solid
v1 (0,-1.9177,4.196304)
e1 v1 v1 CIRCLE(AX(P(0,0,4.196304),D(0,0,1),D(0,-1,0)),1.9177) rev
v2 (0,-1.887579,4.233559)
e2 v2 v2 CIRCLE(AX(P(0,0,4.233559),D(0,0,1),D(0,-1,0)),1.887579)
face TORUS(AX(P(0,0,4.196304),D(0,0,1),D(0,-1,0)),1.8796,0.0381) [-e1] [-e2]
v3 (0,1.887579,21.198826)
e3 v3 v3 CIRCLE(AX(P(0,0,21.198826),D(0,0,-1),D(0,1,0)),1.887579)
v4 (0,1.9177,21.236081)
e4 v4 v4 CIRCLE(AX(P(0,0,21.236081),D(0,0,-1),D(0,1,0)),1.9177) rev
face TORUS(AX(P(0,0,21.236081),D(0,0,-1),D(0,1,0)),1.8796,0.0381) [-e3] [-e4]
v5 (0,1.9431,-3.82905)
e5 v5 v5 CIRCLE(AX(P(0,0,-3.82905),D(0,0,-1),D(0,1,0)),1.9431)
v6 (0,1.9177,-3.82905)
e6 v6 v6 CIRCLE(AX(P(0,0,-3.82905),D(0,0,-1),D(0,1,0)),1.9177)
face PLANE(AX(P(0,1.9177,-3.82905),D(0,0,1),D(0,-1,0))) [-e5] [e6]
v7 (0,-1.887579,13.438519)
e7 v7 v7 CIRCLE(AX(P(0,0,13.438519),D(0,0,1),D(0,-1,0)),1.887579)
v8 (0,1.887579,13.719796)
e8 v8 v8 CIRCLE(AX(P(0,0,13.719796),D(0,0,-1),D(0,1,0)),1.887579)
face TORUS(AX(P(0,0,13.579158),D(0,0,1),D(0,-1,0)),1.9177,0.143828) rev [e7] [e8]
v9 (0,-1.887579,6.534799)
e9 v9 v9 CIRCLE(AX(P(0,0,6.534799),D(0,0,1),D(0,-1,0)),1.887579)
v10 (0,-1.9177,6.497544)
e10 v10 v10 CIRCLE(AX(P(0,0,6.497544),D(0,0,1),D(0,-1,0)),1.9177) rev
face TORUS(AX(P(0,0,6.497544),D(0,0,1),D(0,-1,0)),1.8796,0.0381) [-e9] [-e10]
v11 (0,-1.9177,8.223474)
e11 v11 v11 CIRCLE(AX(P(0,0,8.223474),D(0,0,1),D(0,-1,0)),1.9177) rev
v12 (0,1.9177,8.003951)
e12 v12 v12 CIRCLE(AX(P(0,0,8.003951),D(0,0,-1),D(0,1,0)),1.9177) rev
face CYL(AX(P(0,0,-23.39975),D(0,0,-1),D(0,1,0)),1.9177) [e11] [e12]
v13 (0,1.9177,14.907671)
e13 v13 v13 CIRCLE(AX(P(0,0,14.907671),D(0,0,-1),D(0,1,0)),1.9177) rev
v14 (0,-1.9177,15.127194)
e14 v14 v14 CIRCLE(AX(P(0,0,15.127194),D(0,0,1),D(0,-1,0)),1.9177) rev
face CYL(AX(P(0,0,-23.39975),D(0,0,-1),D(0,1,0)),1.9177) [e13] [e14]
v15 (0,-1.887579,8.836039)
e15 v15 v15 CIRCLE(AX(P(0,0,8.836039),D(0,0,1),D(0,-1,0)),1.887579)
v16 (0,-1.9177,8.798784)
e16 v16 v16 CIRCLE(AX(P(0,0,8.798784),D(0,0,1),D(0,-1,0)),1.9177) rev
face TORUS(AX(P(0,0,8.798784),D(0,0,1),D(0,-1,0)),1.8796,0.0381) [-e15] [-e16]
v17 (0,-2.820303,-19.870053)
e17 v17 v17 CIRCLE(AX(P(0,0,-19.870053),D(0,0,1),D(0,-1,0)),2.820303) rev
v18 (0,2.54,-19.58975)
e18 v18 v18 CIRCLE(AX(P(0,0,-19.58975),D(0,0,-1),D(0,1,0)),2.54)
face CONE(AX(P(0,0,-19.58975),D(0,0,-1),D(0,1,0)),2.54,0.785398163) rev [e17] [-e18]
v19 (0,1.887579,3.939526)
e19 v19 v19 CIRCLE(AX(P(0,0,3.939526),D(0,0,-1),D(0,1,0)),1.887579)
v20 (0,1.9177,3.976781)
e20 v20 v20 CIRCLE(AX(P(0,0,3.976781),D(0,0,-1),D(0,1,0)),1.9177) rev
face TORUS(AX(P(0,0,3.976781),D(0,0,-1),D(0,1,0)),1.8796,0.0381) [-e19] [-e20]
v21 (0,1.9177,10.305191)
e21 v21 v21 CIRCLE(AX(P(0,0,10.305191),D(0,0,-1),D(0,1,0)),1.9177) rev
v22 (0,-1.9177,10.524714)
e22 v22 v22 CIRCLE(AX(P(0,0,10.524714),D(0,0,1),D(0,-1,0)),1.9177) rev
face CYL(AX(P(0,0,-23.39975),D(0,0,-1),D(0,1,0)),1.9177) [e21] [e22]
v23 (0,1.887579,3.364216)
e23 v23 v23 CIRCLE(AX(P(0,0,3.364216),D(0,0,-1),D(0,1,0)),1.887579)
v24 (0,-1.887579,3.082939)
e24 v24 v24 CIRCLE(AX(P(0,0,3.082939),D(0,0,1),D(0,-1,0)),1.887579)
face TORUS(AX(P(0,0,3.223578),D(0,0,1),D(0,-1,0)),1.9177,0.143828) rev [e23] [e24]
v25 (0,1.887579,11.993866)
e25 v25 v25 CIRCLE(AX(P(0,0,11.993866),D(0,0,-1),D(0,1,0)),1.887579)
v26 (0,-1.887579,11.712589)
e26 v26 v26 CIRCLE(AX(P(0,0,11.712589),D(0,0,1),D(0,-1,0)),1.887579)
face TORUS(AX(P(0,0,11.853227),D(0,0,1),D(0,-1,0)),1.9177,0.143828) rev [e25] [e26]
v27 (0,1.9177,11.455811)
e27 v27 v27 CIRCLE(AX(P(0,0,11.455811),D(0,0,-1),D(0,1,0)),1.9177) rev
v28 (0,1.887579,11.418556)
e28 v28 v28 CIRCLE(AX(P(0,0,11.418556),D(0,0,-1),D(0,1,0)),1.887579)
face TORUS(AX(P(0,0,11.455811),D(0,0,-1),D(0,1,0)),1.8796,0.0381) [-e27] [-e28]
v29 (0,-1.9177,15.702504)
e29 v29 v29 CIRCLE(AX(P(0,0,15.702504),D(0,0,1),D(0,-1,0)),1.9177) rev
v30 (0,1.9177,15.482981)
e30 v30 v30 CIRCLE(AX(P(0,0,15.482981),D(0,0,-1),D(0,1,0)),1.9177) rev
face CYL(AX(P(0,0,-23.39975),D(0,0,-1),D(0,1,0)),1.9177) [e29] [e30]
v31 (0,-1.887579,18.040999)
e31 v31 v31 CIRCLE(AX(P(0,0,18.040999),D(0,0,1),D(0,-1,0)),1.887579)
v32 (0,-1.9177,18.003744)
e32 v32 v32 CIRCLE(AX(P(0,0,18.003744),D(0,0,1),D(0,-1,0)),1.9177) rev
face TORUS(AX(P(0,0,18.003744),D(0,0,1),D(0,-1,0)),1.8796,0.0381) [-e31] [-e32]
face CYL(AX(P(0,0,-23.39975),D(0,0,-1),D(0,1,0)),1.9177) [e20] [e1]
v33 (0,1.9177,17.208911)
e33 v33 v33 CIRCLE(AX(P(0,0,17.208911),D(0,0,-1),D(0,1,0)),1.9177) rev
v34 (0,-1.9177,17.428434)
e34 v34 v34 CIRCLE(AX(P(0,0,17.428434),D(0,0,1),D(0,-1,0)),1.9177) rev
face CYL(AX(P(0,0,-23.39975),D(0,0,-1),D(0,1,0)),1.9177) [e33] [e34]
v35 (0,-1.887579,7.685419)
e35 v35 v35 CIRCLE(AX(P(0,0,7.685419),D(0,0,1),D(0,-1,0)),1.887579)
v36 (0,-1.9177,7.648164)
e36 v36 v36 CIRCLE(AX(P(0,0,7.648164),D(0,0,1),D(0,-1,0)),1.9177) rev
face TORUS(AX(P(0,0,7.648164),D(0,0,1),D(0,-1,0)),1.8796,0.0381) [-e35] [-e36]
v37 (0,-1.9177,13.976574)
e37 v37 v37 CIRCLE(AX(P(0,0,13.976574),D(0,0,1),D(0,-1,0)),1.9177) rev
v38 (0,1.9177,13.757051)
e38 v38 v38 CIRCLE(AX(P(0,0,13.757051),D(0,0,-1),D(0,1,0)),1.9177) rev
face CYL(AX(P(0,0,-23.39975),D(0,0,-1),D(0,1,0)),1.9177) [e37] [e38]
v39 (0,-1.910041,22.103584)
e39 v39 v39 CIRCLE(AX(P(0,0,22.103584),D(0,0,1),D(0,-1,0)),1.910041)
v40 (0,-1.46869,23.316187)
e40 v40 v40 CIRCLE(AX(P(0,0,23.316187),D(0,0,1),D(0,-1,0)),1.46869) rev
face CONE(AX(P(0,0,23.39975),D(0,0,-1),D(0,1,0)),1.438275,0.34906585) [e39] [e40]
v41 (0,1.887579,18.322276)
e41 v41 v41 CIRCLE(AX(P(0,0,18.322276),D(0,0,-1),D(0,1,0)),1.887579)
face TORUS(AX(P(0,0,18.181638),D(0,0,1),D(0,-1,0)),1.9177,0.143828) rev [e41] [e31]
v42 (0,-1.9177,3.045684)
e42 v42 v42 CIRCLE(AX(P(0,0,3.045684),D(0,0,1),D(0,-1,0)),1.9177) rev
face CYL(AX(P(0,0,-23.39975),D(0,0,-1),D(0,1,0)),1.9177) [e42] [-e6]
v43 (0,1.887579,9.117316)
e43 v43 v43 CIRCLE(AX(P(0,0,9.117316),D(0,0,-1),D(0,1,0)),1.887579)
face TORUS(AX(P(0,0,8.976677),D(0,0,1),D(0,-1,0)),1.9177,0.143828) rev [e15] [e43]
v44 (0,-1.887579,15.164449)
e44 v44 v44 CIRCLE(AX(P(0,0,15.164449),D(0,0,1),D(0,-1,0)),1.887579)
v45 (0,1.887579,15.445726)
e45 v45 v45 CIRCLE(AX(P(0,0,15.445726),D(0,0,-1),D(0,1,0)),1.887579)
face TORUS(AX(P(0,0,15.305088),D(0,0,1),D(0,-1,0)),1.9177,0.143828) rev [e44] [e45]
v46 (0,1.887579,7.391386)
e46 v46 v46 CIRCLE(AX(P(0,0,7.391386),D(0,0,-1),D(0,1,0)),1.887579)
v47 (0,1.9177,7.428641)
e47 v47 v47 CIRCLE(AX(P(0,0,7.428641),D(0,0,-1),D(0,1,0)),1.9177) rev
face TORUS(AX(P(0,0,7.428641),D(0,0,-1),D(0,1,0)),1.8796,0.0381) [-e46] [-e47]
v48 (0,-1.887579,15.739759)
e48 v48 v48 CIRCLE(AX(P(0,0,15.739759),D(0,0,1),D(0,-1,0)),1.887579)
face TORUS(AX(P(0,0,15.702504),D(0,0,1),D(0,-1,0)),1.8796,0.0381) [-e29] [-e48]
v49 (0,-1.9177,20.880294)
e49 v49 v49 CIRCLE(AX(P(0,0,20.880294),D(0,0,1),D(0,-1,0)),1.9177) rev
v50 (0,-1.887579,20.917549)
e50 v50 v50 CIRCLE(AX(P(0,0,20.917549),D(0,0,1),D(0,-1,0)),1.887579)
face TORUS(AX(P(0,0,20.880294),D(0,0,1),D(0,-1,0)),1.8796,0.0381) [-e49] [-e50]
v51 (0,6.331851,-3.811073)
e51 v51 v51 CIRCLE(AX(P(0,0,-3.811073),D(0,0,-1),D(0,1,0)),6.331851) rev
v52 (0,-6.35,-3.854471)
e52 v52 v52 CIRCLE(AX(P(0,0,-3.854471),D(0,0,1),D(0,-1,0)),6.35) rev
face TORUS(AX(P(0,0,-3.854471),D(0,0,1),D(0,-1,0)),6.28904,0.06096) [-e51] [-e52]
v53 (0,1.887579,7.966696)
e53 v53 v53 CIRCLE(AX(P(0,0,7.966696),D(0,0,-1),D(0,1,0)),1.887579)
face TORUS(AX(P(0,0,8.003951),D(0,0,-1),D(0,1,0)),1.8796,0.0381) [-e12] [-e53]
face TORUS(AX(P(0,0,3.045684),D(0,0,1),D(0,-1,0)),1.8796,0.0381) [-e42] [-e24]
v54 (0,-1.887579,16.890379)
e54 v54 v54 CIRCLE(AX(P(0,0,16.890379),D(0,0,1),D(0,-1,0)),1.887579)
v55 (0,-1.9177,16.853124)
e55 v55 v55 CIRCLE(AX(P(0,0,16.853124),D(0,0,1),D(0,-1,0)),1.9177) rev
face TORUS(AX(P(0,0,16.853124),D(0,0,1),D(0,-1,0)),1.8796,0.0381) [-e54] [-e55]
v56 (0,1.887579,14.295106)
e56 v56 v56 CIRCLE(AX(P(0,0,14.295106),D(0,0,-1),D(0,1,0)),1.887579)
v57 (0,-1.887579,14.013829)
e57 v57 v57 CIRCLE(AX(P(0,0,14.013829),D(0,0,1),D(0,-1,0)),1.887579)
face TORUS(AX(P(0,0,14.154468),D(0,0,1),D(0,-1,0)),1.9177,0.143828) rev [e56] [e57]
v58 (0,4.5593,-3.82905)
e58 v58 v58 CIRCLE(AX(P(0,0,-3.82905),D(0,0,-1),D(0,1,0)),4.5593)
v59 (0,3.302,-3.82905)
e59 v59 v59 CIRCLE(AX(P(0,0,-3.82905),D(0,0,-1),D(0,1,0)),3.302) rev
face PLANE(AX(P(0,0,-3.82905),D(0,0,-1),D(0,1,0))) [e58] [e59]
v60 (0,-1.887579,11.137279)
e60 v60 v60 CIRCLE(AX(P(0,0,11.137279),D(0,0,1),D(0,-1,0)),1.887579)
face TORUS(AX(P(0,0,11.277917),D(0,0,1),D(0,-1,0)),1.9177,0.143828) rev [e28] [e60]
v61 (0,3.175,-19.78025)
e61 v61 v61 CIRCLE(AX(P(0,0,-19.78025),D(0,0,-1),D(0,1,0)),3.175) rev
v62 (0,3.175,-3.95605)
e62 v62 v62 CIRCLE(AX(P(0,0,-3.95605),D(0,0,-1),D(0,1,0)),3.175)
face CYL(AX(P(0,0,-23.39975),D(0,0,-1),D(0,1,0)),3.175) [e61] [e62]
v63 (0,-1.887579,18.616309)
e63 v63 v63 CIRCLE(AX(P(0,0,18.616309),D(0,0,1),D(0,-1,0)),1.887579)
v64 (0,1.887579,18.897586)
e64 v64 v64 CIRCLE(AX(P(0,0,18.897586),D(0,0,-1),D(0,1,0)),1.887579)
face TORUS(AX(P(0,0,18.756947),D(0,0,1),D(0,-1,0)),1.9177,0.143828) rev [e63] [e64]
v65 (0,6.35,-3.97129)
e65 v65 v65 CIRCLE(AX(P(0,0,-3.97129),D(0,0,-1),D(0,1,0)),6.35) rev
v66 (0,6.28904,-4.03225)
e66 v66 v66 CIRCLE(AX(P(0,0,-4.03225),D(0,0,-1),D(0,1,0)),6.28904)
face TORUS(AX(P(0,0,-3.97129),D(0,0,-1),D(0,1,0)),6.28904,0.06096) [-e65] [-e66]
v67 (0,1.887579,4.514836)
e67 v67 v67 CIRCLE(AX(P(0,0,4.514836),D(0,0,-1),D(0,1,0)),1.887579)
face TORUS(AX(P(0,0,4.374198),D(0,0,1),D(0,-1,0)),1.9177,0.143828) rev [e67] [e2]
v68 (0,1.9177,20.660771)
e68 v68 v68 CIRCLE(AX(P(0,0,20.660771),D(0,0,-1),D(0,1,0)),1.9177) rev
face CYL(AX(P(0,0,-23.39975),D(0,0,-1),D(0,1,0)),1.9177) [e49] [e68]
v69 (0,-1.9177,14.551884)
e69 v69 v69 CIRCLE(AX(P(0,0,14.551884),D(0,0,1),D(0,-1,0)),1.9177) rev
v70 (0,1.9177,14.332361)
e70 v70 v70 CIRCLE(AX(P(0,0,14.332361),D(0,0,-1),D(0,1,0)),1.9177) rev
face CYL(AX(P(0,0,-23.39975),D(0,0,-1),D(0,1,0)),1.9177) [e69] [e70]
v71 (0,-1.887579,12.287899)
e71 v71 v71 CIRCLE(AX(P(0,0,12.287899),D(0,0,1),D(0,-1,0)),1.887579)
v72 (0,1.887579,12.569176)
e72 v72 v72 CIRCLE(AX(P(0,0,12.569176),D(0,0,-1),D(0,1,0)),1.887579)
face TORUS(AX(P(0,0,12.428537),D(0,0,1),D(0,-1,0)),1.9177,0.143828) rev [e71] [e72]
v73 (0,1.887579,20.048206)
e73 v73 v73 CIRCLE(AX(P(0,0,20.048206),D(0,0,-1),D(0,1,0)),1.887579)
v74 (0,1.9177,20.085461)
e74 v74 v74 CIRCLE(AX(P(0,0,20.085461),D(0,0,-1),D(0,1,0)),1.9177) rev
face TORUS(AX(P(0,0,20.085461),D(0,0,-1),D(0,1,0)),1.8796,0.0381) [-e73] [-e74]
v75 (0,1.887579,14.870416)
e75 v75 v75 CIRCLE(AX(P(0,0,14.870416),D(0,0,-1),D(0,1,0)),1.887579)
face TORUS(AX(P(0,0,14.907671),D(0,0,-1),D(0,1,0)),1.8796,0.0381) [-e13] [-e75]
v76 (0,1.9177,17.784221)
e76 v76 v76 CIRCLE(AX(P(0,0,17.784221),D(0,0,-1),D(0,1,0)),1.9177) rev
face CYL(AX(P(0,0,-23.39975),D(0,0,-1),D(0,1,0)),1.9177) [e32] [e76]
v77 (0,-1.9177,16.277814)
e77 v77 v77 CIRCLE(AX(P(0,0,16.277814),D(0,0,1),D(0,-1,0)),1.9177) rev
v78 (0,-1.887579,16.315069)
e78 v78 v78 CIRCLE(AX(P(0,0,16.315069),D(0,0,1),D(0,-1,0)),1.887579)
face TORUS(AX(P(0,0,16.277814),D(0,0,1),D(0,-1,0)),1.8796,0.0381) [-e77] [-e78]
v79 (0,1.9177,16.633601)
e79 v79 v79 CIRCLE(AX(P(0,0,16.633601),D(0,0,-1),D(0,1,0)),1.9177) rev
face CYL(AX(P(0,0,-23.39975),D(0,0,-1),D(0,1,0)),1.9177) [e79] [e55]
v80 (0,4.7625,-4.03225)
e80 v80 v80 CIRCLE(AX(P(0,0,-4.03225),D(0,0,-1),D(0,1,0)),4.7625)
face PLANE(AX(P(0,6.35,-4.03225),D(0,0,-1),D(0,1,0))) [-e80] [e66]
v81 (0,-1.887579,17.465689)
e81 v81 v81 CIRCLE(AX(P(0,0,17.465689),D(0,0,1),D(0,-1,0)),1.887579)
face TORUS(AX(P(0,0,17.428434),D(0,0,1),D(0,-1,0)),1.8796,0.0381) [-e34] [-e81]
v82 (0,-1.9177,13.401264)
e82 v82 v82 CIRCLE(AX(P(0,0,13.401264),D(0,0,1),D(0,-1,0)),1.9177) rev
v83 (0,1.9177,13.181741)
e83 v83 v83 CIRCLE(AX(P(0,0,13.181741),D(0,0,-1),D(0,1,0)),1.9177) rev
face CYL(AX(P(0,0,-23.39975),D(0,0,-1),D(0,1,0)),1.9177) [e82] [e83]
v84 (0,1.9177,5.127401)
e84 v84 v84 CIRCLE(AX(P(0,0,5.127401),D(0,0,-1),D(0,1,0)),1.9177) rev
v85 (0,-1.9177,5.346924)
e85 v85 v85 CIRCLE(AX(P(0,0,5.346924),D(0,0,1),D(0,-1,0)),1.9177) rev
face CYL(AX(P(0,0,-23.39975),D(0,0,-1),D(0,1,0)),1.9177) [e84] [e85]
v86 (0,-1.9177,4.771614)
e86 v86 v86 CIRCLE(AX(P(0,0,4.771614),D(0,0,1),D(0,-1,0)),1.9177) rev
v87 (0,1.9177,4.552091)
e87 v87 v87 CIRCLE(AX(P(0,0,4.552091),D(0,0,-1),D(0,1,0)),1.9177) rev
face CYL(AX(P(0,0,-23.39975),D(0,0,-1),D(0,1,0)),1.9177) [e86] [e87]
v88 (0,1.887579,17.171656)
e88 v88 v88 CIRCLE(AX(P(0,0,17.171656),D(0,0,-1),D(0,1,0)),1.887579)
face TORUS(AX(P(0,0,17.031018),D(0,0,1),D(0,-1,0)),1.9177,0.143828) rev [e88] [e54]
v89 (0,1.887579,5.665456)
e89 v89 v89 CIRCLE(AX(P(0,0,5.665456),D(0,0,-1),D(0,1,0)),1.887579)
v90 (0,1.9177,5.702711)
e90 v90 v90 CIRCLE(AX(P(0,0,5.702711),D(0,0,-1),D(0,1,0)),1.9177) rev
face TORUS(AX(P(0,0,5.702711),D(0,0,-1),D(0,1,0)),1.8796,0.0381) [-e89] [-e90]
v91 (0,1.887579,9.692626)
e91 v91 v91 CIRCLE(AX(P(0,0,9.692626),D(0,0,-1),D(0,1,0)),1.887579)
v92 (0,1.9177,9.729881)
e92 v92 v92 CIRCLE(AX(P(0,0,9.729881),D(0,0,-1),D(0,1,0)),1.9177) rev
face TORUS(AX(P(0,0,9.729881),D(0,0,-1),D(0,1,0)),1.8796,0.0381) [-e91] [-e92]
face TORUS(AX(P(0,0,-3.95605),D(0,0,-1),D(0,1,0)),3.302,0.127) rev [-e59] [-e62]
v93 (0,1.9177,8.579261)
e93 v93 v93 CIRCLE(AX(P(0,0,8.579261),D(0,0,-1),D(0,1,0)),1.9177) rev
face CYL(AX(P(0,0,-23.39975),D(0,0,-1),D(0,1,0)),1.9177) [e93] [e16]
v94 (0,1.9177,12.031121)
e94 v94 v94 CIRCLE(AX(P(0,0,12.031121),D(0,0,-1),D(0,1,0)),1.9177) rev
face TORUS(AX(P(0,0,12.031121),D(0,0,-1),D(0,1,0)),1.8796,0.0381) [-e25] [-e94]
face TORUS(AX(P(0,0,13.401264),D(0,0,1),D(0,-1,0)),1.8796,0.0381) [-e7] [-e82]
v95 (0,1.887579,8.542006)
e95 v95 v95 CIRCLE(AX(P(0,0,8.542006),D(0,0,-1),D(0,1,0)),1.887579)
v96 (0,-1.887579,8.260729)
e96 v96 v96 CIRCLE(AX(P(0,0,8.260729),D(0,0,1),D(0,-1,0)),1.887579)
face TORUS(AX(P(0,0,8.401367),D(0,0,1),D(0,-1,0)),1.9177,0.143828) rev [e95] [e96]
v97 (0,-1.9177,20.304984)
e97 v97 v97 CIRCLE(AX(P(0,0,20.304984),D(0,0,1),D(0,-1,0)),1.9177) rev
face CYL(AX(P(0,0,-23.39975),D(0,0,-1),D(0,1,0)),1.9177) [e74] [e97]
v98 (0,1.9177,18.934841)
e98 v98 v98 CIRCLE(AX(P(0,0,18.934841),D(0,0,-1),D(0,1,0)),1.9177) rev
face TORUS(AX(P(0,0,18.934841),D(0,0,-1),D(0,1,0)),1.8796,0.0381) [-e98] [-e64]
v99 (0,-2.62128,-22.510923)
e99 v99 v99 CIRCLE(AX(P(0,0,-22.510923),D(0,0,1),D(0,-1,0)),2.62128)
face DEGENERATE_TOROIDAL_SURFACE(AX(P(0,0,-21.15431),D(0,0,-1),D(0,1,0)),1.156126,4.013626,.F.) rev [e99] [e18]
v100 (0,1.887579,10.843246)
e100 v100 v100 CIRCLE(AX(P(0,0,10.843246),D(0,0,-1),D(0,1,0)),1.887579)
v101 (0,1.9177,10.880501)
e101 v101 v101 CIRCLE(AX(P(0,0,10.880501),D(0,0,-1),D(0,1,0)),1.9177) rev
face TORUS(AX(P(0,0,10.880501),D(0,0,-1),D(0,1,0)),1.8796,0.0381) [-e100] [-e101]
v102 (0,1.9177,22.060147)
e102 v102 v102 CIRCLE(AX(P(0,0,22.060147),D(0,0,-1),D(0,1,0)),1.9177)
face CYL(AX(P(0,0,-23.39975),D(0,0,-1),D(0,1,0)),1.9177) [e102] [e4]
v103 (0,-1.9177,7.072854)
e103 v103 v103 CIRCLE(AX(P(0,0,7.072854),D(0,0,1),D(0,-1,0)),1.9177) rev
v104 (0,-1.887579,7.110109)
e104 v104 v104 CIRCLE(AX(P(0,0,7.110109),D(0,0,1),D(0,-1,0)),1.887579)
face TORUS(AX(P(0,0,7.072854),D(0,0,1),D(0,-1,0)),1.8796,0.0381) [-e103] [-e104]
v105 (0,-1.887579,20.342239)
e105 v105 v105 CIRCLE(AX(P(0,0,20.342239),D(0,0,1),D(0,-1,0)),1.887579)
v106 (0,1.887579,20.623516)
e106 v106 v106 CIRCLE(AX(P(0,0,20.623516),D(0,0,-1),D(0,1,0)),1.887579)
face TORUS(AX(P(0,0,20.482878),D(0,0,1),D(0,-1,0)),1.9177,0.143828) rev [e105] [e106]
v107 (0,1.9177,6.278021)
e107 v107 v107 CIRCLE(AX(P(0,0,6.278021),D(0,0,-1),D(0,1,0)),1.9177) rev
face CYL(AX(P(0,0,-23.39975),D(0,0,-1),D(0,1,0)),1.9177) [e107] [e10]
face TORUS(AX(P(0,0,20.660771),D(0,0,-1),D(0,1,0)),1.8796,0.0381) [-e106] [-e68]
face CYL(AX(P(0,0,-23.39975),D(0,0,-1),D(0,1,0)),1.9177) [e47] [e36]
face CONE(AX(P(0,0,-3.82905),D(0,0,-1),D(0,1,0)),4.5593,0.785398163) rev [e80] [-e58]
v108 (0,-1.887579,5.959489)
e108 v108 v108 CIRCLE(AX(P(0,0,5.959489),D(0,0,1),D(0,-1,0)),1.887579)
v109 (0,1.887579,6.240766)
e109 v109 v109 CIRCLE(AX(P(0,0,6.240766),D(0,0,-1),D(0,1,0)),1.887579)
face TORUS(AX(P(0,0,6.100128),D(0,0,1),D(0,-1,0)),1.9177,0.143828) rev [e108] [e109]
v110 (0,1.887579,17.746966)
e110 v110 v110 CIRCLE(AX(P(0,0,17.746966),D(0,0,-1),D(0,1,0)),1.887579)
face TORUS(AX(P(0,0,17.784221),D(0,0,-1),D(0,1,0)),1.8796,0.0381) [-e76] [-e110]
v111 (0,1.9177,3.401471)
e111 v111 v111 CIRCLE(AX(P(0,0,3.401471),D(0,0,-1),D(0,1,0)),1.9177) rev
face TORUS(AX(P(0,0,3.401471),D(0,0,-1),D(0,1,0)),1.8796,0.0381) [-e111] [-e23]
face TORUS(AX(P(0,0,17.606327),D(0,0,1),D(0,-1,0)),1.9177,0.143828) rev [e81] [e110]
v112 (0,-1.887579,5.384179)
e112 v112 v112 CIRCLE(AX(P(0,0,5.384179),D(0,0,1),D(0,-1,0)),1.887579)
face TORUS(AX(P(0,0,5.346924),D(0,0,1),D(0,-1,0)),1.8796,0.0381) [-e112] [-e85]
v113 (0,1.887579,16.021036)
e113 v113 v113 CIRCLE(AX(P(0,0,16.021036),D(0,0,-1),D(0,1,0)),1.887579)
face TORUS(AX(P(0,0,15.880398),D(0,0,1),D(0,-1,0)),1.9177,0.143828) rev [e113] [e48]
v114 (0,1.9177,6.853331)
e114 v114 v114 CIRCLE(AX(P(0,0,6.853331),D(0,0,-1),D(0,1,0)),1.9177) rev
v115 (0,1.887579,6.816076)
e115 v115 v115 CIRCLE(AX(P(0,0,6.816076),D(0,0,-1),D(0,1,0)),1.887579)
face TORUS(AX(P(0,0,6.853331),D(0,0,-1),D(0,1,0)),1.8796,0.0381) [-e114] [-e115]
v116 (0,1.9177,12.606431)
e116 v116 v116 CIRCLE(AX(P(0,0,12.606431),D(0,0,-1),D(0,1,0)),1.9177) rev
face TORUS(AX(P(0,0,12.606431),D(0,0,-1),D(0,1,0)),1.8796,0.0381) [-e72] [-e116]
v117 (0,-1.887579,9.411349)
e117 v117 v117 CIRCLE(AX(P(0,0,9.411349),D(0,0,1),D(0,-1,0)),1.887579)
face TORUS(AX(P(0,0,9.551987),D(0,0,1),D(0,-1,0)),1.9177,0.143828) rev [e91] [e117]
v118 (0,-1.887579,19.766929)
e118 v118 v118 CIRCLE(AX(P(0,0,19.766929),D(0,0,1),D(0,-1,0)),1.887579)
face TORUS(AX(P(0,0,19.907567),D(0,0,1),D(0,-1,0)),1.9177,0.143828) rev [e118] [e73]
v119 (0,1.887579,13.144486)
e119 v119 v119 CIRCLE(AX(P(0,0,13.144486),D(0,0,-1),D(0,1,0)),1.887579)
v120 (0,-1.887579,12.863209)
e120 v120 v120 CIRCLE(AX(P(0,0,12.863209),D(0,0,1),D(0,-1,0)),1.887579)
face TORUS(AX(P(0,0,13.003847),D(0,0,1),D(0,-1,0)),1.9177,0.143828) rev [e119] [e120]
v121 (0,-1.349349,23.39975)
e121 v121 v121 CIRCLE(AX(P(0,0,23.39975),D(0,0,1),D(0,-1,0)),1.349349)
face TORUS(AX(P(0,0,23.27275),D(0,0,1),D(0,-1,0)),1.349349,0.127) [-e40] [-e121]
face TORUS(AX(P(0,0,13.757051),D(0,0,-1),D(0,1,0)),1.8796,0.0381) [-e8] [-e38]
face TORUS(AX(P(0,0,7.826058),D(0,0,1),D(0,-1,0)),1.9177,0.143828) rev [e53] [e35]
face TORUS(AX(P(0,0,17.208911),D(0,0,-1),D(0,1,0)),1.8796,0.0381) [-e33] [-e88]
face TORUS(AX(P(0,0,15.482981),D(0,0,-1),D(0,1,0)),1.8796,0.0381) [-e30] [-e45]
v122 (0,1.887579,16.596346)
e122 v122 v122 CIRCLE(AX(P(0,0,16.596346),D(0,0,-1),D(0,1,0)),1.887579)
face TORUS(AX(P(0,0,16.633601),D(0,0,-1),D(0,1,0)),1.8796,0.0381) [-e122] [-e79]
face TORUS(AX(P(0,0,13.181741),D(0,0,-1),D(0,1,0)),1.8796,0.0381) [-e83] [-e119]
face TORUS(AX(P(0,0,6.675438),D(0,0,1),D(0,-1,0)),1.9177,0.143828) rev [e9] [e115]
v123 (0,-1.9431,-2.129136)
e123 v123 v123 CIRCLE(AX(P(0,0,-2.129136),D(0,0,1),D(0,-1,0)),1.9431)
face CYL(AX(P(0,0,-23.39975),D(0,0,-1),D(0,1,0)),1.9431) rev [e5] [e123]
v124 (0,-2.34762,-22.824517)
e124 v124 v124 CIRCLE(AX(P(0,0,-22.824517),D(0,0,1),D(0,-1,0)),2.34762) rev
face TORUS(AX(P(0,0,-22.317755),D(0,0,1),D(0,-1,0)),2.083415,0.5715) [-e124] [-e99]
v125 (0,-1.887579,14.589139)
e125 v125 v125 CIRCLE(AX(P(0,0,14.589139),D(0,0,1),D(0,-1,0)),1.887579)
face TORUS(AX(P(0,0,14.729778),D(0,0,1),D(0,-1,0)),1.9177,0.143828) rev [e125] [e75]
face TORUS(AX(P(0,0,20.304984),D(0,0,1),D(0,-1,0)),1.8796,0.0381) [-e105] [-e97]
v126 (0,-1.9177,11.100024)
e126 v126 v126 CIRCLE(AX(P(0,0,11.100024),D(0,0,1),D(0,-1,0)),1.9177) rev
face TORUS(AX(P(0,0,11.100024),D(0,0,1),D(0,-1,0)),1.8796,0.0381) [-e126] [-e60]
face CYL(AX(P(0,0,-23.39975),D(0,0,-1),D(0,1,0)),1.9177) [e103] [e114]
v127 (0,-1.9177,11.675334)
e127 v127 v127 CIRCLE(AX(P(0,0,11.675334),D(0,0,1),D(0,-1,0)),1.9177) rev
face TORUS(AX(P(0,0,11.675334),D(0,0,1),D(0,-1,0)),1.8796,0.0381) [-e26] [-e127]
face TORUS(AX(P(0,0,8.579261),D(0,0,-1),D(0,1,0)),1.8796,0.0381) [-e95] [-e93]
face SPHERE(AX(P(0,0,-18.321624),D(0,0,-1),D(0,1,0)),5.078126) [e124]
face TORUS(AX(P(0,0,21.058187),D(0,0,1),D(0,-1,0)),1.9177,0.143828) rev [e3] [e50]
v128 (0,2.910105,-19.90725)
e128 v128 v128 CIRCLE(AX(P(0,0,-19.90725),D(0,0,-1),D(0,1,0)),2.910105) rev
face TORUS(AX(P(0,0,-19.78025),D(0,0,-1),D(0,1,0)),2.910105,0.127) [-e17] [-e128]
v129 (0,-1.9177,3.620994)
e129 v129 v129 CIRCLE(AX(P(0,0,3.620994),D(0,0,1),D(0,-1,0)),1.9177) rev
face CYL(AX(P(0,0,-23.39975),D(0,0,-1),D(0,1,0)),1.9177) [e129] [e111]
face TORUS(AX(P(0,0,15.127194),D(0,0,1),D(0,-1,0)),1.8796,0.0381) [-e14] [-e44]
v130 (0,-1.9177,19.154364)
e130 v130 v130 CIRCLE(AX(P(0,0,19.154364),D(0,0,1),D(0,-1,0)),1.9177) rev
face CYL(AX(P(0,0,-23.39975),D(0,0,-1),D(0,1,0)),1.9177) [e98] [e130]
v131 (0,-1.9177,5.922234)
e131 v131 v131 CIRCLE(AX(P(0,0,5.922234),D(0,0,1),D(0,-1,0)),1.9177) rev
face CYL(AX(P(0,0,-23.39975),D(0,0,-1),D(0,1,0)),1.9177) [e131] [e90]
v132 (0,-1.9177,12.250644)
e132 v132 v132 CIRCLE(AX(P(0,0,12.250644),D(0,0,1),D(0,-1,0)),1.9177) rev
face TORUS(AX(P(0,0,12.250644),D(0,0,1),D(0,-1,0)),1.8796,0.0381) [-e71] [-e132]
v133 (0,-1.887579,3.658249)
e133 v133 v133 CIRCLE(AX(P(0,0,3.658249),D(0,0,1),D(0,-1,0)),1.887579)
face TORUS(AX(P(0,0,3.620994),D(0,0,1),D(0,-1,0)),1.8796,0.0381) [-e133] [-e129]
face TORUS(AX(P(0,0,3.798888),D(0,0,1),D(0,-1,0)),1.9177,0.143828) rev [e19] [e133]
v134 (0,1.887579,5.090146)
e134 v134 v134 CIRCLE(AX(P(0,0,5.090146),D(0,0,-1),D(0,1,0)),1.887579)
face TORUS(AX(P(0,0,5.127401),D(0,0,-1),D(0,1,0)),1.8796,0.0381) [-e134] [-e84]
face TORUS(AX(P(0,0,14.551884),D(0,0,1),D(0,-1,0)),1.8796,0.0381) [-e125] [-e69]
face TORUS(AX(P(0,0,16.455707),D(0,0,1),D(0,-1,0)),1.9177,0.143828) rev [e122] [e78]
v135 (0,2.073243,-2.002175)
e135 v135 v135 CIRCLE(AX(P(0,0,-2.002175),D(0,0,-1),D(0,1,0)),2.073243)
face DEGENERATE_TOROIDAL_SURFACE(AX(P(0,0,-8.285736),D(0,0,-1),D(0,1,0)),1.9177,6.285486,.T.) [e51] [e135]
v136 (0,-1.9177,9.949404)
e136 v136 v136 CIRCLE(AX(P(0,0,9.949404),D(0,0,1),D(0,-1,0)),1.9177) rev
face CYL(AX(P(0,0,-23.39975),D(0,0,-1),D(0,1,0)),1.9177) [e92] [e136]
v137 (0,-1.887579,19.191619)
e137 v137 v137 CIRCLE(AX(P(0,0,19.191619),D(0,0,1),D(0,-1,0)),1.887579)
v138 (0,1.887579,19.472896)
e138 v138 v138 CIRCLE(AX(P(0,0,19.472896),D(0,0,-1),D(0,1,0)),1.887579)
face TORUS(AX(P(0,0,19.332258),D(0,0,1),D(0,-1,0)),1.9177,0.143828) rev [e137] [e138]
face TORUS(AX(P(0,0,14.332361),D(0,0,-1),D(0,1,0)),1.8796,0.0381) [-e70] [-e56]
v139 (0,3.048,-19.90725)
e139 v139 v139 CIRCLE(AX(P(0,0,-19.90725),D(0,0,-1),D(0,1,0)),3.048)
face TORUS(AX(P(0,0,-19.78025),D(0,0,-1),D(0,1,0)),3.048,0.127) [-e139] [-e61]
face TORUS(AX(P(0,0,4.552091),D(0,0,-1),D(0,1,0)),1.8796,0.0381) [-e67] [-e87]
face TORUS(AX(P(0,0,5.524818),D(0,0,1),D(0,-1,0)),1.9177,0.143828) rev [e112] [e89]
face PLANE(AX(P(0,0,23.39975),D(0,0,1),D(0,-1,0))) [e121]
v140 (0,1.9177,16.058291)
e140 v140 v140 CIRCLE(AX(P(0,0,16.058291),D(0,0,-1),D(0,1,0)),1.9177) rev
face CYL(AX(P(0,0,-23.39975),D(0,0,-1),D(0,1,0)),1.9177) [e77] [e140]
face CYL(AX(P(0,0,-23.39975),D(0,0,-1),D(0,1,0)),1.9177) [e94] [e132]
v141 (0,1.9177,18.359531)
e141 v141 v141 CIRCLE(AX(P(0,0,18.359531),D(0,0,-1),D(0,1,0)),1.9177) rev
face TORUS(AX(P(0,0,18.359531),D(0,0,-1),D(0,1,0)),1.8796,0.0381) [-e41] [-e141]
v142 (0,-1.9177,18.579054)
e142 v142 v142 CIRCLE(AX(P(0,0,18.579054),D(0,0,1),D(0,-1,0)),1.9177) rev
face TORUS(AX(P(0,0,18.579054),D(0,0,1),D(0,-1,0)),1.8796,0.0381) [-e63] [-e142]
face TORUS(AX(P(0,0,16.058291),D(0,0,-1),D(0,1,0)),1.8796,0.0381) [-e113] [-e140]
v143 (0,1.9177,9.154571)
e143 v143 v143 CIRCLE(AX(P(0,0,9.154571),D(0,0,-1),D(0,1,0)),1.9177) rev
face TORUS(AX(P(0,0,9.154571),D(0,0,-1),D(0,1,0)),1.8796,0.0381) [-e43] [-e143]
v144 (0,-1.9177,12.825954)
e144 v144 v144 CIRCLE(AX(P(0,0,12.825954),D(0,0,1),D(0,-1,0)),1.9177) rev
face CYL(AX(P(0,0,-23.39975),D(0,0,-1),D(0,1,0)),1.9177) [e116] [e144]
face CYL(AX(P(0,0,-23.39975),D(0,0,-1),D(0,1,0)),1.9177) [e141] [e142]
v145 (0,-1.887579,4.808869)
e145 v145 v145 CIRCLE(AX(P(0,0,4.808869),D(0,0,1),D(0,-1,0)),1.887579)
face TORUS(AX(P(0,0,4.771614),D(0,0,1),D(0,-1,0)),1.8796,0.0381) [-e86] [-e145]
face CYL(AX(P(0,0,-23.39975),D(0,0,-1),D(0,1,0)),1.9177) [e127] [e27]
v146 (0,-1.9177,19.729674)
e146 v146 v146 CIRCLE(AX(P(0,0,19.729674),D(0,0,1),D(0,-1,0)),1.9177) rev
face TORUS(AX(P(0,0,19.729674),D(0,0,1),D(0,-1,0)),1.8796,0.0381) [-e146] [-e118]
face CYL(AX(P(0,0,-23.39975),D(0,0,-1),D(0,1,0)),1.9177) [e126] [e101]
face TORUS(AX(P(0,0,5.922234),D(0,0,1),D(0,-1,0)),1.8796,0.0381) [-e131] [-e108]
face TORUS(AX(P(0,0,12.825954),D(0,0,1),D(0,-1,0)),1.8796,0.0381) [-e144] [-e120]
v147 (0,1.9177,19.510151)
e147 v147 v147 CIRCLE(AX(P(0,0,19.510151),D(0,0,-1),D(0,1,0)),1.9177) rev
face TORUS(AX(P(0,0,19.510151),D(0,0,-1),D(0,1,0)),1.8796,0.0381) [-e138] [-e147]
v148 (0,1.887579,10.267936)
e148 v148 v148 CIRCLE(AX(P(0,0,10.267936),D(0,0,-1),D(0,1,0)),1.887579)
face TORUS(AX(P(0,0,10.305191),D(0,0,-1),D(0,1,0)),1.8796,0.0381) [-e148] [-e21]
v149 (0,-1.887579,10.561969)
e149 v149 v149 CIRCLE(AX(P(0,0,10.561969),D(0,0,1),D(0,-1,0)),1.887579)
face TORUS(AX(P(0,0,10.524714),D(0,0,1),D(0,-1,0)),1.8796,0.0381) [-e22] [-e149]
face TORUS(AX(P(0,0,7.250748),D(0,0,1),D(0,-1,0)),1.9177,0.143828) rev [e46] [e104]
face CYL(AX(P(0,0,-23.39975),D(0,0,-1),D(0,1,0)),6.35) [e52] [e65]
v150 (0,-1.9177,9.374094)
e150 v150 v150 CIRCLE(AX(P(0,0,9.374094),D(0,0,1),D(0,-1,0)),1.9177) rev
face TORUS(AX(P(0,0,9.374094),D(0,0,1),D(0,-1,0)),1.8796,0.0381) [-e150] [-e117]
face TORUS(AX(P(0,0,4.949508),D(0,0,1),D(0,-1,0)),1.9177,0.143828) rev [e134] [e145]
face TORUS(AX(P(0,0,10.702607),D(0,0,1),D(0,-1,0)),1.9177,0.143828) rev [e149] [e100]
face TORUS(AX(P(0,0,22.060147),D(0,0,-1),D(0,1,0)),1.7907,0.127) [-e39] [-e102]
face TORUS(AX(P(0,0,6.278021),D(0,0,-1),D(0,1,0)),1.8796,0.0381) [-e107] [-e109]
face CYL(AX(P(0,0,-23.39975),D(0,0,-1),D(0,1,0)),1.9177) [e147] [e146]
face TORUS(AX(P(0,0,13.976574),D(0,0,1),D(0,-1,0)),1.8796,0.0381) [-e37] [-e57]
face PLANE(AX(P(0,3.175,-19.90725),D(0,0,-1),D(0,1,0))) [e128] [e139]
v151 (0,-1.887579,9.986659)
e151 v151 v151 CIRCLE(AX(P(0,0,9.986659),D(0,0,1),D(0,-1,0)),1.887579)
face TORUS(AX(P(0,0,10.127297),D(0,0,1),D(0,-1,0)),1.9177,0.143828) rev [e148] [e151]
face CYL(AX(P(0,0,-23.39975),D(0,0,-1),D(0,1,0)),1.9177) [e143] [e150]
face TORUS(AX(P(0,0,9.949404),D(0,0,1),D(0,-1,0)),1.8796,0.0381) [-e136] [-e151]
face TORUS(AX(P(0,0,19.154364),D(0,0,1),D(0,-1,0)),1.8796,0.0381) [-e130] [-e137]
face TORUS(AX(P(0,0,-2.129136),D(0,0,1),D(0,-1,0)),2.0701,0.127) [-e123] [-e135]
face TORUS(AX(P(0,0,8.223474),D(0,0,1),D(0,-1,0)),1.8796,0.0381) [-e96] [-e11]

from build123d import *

# Parameters (mm, degrees)
SKETCH7_R          = 4.7625
SKETCH7_R_2        = 3.175
CUT_EXTRUDE1_DEPTH = 0.2032
FILLET1_R          = 0.127
FILLET2_R          = 0.5715
FILLET3_R          = 0.06096
CHAMFER1_SIZE      = 0.2032
SKETCH6_R          = 0.1438275
LPATTERN2_COUNT    = 32
LPATTERN2_PITCH    = 0.57531


with BuildPart() as part:
    # Sketch2 → Revolve1 (revolve)
    with BuildSketch(Plane(origin=(0, 0, 0), x_dir=(0, 0, -1), z_dir=(1, 0, 0))):
        with BuildLine():
            Line((-23.39975, 0), (-23.39975, 1.9177))
            Line((-23.39975, 1.9177), (2.00025, 1.9177))
            Line((2.00025, 1.9177), (3.82905, 1.9177))
            Line((3.82905, 1.9177), (3.82905, 1.9431))
            Line((3.82905, 1.9431), (2.000301322, 1.9431))
            ThreePointArc((2.000301322, 1.9431), (2.480266056, 4.326818668), (3.82905, 6.35))
            Line((3.82905, 6.35), (4.03225, 6.35))
            Line((4.03225, 6.35), (4.03225, 3.175))
            Line((4.03225, 3.175), (19.90725, 3.175))
            Line((19.90725, 3.175), (19.90725, 2.8575))
            Line((19.90725, 2.8575), (19.58975, 2.54))
            ThreePointArc((19.58975, 2.54), (21.154309526, 2.8575), (22.718869053, 2.54))
            ThreePointArc((22.718869053, 2.54), (23.226577012, 1.314838285), (23.39975, 0))
            Line((23.39975, 0), (-23.39975, 0))
        make_face()
    revolve(axis=Axis((0, 0, -23.39975), (0, 0, 1)))

    # Sketch7 → Cut-Extrude1 (cut)
    with BuildSketch(Plane(origin=(0, 0, -4.03225), x_dir=(-1, 0, 0), z_dir=(0, 0, -1))):
        with Locations(Location((0, 0, 0), (0, 0, 90))):
            Circle(SKETCH7_R)
        with Locations(Location((0, 0, 0), (0, 0, 90))):
            Circle(SKETCH7_R_2, mode=Mode.SUBTRACT)
    extrude(amount=-CUT_EXTRUDE1_DEPTH, mode=Mode.SUBTRACT)

    # Sketch8 → Cut-Revolve3 (revolve, cut)
    with BuildSketch(Plane(origin=(0, 0, 0), x_dir=(0, 0, -1), z_dir=(1, 0, 0))):
        Polygon((-23.39975, 1.438275), (-22.082540638, 1.9177), (-23.39975, 1.9177), align=None)
    revolve(axis=Axis((0, 0, 23.39975), (0, 0, -1)), mode=Mode.SUBTRACT)

    # Fillet1
    fillet1_edges = [part.edges().sort_by_distance(p)[0] for p in [
        (0, -2.8575, -19.90725),
        (0, -3.175, -19.90725),
        (0, -1.9431, -2.000301322),
        (0, -3.175, -3.82905),
        (0, -1.9177, 22.082540638),
        (0, -1.438275, 23.39975),
    ]]
    fillet(fillet1_edges, radius=FILLET1_R)

    # Fillet2
    fillet2_edges = [part.edges().sort_by_distance(p)[0] for p in [
        (0, -2.54, -22.718869053),
    ]]
    fillet(fillet2_edges, radius=FILLET2_R)

    # Fillet3
    fillet3_edges = [part.edges().sort_by_distance(p)[0] for p in [
        (0, -6.35, -4.03225),
        (0, -6.35, -3.82905),
    ]]
    fillet(fillet3_edges, radius=FILLET3_R)

    # Chamfer1
    chamfer1_edges = [part.edges().sort_by_distance(p)[0] for p in [
        (0, -4.7625, -3.82905),
    ]]
    chamfer(chamfer1_edges, length=CHAMFER1_SIZE - 0.0001)  # a hair under: the kernel refuses the full size

    # Sketch6 → Cut-Revolve2 (revolve, cut)
    with BuildSketch(Plane(origin=(0, 0, 0), x_dir=(0, 0, -1), z_dir=(1, 0, 0))):
        with Locations((-3.2235775, 1.9177)):
            Circle(SKETCH6_R)
    cut_revolve2 = revolve(axis=Axis((0, 0, 23.39975), (0, 0, -1)), mode=Mode.SUBTRACT)

    # Fillet4: read off the stored shape, not the designer's step
    # Fillet4 outline → Fillet4 (revolve, cut)
    with BuildSketch(Plane.XZ):
        with BuildLine():
            ThreePointArc((1.887579058, 3.082939388), (1.909227792, 3.069638464), (1.9177, 3.045684259))
            Line((1.9177, 3.045684259), (1.9177, 3.082939388))
            Line((1.9177, 3.082939388), (1.887579058, 3.082939388))
        make_face()
        with BuildLine():
            ThreePointArc((1.9177, 3.401470741), (1.909227792, 3.377516536), (1.887579058, 3.364215612))
            Line((1.887579058, 3.364215612), (1.9177, 3.364215612))
            Line((1.9177, 3.364215612), (1.9177, 3.401470741))
        make_face()
    fillet4 = revolve(axis=Axis((0, 0, 0), (0, 0, 1)), mode=Mode.SUBTRACT)

    # LPattern2: Cut-Revolve2, Fillet4 ×32
    with Locations(*[(0, 0, i * LPATTERN2_PITCH) for i in range(1, LPATTERN2_COUNT)]):
        add(cut_revolve2, mode=Mode.SUBTRACT)
        add(fillet4, mode=Mode.SUBTRACT)


solid = part.part
